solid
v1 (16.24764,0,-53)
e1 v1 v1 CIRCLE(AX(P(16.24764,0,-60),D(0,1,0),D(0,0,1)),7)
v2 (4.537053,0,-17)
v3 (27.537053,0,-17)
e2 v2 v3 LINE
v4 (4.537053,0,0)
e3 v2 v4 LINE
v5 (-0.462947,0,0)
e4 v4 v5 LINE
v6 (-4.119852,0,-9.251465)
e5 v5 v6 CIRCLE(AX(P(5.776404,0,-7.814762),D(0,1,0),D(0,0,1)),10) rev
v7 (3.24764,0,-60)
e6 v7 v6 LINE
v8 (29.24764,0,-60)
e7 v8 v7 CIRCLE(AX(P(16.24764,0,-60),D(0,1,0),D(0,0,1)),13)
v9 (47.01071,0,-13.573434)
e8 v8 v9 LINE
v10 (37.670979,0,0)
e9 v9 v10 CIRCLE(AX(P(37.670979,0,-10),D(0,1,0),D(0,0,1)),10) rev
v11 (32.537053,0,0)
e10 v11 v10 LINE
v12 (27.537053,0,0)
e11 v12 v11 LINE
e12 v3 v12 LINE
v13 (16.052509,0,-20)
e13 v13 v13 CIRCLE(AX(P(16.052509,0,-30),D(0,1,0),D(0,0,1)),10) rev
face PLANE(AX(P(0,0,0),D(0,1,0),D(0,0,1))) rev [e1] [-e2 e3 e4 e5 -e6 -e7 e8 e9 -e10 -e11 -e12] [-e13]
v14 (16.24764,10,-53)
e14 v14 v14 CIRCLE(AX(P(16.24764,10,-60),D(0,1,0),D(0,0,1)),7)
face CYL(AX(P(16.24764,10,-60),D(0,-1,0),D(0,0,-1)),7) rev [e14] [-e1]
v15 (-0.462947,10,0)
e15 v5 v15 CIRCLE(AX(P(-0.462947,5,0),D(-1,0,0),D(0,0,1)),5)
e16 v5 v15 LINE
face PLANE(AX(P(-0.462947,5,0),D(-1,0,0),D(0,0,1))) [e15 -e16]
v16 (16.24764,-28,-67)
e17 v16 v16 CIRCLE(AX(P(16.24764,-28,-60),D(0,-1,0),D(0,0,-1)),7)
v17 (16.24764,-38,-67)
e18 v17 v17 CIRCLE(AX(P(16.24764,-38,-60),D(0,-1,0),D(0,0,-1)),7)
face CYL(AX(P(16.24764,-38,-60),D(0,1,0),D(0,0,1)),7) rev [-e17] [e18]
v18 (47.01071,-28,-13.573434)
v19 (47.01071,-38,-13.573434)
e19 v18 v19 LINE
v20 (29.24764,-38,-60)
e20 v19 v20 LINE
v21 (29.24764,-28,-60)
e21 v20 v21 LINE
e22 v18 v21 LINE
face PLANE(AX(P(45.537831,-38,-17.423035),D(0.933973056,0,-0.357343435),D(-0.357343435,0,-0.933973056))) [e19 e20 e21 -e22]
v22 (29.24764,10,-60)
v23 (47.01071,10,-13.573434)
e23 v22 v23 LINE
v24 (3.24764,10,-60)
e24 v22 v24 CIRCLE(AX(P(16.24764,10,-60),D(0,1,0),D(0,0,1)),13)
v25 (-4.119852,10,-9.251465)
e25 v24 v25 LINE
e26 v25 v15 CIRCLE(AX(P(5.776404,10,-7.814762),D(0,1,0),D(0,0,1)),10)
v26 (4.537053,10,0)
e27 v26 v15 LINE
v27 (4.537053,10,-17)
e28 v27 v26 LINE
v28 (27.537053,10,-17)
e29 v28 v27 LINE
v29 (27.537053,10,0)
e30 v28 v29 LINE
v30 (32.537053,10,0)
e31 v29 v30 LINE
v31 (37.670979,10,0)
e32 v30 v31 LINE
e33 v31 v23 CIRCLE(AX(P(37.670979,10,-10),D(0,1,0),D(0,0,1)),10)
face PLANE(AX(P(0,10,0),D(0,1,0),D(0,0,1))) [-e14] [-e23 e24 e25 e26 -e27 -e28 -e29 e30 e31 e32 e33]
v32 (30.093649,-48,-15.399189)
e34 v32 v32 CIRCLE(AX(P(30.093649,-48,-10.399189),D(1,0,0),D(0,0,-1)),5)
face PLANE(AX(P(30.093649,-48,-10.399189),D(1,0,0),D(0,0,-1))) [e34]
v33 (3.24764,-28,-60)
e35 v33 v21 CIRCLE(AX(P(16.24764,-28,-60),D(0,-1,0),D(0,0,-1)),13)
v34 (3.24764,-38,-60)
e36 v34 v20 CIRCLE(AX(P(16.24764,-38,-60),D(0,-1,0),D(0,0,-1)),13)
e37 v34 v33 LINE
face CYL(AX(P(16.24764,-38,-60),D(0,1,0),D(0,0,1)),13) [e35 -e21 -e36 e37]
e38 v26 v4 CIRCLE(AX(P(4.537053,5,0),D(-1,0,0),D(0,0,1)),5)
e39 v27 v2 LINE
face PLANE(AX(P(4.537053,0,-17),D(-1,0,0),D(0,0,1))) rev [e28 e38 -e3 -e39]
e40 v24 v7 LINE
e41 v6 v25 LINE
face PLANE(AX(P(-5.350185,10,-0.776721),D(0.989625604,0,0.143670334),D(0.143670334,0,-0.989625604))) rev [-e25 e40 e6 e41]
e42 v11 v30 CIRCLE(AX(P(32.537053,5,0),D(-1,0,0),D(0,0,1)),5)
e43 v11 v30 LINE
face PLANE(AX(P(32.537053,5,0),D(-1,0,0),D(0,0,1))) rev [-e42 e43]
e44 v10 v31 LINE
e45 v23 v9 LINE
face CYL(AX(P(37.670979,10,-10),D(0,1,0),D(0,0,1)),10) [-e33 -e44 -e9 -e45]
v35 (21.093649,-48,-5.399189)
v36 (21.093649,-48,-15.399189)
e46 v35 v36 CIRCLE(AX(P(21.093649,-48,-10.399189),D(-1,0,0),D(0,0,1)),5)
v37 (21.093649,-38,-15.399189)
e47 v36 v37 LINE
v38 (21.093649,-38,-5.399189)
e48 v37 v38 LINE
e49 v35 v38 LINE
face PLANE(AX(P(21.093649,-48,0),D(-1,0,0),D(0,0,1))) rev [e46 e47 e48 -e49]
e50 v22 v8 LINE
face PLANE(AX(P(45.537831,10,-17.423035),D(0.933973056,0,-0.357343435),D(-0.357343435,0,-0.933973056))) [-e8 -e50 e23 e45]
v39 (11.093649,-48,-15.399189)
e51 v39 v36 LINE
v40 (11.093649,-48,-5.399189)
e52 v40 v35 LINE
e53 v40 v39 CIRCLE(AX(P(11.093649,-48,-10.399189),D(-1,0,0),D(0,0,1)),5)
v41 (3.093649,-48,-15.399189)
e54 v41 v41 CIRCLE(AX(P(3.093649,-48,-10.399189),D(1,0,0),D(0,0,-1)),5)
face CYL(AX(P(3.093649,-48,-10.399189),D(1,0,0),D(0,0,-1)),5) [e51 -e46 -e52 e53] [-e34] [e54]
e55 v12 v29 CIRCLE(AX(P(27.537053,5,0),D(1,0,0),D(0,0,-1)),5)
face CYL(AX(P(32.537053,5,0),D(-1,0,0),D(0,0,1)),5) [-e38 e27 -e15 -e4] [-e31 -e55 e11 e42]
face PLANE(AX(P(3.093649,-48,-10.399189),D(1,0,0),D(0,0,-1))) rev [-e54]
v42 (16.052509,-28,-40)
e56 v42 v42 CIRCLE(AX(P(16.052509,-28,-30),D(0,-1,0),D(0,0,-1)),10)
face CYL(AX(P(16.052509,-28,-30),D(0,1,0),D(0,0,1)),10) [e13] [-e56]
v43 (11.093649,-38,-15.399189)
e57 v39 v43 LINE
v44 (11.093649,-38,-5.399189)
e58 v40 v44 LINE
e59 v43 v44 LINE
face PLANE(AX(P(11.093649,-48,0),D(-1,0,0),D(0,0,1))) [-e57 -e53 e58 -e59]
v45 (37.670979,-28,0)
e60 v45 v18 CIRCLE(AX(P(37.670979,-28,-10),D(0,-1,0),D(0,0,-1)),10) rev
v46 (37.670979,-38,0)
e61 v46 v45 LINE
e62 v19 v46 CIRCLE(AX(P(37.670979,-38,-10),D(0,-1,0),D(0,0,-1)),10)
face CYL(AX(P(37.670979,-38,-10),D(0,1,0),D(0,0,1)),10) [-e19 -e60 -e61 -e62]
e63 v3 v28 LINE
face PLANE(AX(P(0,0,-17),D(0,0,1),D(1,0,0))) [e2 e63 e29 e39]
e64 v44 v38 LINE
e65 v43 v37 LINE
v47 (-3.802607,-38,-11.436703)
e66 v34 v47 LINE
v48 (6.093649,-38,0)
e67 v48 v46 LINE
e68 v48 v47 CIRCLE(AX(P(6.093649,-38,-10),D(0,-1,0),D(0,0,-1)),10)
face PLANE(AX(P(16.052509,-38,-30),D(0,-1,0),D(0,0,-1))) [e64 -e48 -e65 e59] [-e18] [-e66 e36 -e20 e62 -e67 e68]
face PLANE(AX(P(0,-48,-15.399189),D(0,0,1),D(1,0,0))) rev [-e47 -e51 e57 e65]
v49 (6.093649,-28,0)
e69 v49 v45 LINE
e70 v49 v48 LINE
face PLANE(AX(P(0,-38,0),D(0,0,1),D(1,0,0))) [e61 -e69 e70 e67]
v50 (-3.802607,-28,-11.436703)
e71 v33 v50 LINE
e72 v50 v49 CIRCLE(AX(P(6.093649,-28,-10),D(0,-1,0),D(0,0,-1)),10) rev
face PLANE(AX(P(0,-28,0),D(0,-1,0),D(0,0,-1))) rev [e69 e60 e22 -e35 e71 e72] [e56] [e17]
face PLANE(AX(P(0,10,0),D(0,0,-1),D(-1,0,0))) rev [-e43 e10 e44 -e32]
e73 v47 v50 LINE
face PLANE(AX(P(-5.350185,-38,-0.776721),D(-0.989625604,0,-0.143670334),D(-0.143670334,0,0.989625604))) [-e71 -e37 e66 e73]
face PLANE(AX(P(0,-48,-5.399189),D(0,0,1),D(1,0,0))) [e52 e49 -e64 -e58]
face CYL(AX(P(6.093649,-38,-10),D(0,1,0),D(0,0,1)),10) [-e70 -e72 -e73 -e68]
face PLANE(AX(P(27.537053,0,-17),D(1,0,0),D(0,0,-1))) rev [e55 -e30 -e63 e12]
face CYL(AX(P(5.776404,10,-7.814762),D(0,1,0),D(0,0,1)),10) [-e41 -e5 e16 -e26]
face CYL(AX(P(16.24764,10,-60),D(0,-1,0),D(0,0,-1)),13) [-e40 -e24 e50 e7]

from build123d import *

# Parameters (mm, degrees)
SKETCH1_R                = 13
SKETCH1_R_2              = 7
BOSS_EXTRUDE2_DEPTH      = 10
SKETCH2_R                = 10
BOSS_EXTRUDE3_DEPTH      = 28
SKETCH3_R                = 10
SKETCH3_R_2              = 13
SKETCH3_R_3              = 7
BOSS_EXTRUDE4_DEPTH      = 10
SKETCH4_R                = 10
BOSS_EXTRUDE5_DEPTH      = 10
FILLET1_R                = 10
CUT_EXTRUDE1_DEPTH       = 17
BOSS_EXTRUDE6_DEPTH      = 28
BOSS_EXTRUDE6_DEPTH_BACK = 5
SKETCH6_R                = 5
FILLET2_R                = 10
SKETCH7_W                = 10
SKETCH7_H                = 10
BOSS_EXTRUDE7_DEPTH      = 10
BOSS_EXTRUDE8_DEPTH      = 9
BOSS_EXTRUDE8_DEPTH_BACK = 18
SKETCH8_R                = 5


with BuildPart() as part:
    # Sketch1 → Boss-Extrude2 (new body)
    # profile 1 of 2: a face of its own
    with BuildSketch(Plane(origin=(0, 0, 0), x_dir=(1, 0, 0), z_dir=(0, 1, 0))):
        with BuildLine():
            ThreePointArc((29.247640438, 60), (16.247640438, 47), (3.247640438, 60))
            Line((3.247640438, 60), (-5.462946679, 0))
            Line((-5.462946679, 0), (52.203983694, 0))
            Line((52.203983694, 0), (29.247640438, 60))
        make_face()
    # profile 2 of 2: a face of its own
    with BuildSketch(Plane(origin=(0, 0, 0), x_dir=(1, 0, 0), z_dir=(0, 1, 0))):
        with Locations((16.247640438, 60)):
            Circle(SKETCH1_R)
        with Locations(Location((16.247640438, 60, 0), (0, 0, 270))):
            Circle(SKETCH1_R_2, mode=Mode.SUBTRACT)
    extrude(amount=BOSS_EXTRUDE2_DEPTH)

    # Sketch2 → Boss-Extrude3 (add)
    with BuildSketch(Plane.XZ):
        with Locations(Location((16.05250876, -30, 0), (0, 0, 90))):
            Circle(SKETCH2_R)
    extrude(amount=BOSS_EXTRUDE3_DEPTH)



with BuildPart() as body_2:
    # Sketch3 → Boss-Extrude4 (new body)
    # profile 1 of 2: a face of its own
    with BuildSketch(Plane.XZ.offset(28)):
        with BuildLine():
            Line((-5.462946679, 0), (3.247640438, -60))
            ThreePointArc((3.247640438, -60), (16.247640438, -47), (29.247640438, -60))
            Line((29.247640438, -60), (52.203983694, 0))
            Line((52.203983694, 0), (-5.462946679, 0))
        make_face()
        with Locations(Location((16.05250876, -30, 0), (0, 0, 90))):
            Circle(SKETCH3_R, mode=Mode.SUBTRACT)
    # profile 2 of 2: a face of its own
    with BuildSketch(Plane.XZ.offset(28)):
        with Locations((16.247640438, -60)):
            Circle(SKETCH3_R_2)
        with Locations(Location((16.247640438, -60, 0), (0, 0, 90))):
            Circle(SKETCH3_R_3, mode=Mode.SUBTRACT)
    extrude(amount=BOSS_EXTRUDE4_DEPTH)


with BuildPart() as part_1:
    add(part.part)

    add(body_2.part)  # Boss-Extrude5 merges body 2
    # Sketch4 → Boss-Extrude5 (add)
    with BuildSketch(Plane.XZ.offset(28)):
        with Locations(Location((16.05250876, -30, 0), (0, 0, 90))):
            Circle(SKETCH4_R)
    extrude(amount=BOSS_EXTRUDE5_DEPTH)

    # Fillet1
    fillet1_edges = [part_1.edges().sort_by_distance(p)[0] for p in [
        (-5.462946679, -33, 0),
        (52.203983694, -33, 0),
    ]]
    fillet(fillet1_edges, radius=FILLET1_R)

    # Sketch5 → Cut-Extrude1 (cut)
    with BuildSketch(Plane.XY):
        Polygon((27.537053321, 10), (4.537053321, 10), (4.537053321, 5), (4.537053321, 0), (27.537053321, 0), align=None)
    extrude(amount=-CUT_EXTRUDE1_DEPTH, mode=Mode.SUBTRACT)

    # Sketch6 → Boss-Extrude6 (add, two sides: drawn at the far end of the back side and taken through both)
    with BuildSketch(Plane.ZY.offset(-27.537053321).offset(-BOSS_EXTRUDE6_DEPTH_BACK)):
        with Locations(Location((0, 5, 0), (0, 0, 90))):
            Circle(SKETCH6_R)
    extrude(amount=BOSS_EXTRUDE6_DEPTH + BOSS_EXTRUDE6_DEPTH_BACK)

    # Fillet2
    # the kernel refuses this fillet: 10 mm, written as the material it takes off along each edge
    with BuildSketch(Plane(origin=(52.203983694, -36.33251049, 0), x_dir=(-0.3573434345280911, 0, -0.9339730562493053), z_dir=(0, 1, 0))) as fillet2_piece_1:
        with BuildLine():
            CenterArc((FILLET2_R * 1.45330041958, FILLET2_R), FILLET2_R, 159.0628634, 110.9371366)
            Line((FILLET2_R * 0.519327363336, FILLET2_R * 1.35734343453), (FILLET2_R * 0.500647902211, FILLET2_R * 1.36449030322))
            Line((FILLET2_R * 0.500647902211, FILLET2_R * 1.36449030322), (-FILLET2_R * 0.0290660083917, -FILLET2_R * 0.02))
            Line((-FILLET2_R * 0.0290660083917, -FILLET2_R * 0.02), (FILLET2_R * 1.45330041958, -FILLET2_R * 0.02))
            Line((FILLET2_R * 1.45330041958, -FILLET2_R * 0.02), (FILLET2_R * 1.45330041958, 0))
        make_face()
    extrude(amount=82.665020979, mode=Mode.SUBTRACT)
    with BuildSketch(Plane(origin=(-5.462946679, -23.371123881, 0), x_dir=(1, 0, 0), z_dir=(0, 1, 0))) as fillet2_piece_2:
        with BuildLine():
            CenterArc((11.239350904, 7.814761692), FILLET2_R, 171.739711253, 59.656220213)
            Line((1.343094868, 9.251465031), (1.145169748, 9.280199097))
            Line((1.145169748, 9.280199097), (-0.197925121, 0.028734067))
            Line((-0.197925121, 0.028734067), (0, -0.2))
            ThreePointArc((0, -0.2), (2.5, -0.2), (4.875212982, -0.156295234))
            Line((4.875212982, -0.156295234), (5, 0))
        make_face()
    extrude(amount=56.742247763, mode=Mode.SUBTRACT)

    # Sketch7 → Boss-Extrude7 (add)
    with BuildSketch(Plane(origin=(0, -38, 0), x_dir=(-1, 0, 0), z_dir=(0, -1, 0))):
        with Locations((-16.093649369, 10.399188766)):
            Rectangle(SKETCH7_W, SKETCH7_H)
    extrude(amount=BOSS_EXTRUDE7_DEPTH)

    # Sketch8 → Boss-Extrude8 (add, two sides: drawn at the far end of the back side and taken through both)
    with BuildSketch(Plane(origin=(21.093649369, 0, 0), x_dir=(0, 0, -1), z_dir=(1, 0, 0)).offset(-BOSS_EXTRUDE8_DEPTH_BACK)):
        with Locations((10.399188766, -48)):
            Circle(SKETCH8_R)
    extrude(amount=BOSS_EXTRUDE8_DEPTH + BOSS_EXTRUDE8_DEPTH_BACK)


solid = part_1.part
